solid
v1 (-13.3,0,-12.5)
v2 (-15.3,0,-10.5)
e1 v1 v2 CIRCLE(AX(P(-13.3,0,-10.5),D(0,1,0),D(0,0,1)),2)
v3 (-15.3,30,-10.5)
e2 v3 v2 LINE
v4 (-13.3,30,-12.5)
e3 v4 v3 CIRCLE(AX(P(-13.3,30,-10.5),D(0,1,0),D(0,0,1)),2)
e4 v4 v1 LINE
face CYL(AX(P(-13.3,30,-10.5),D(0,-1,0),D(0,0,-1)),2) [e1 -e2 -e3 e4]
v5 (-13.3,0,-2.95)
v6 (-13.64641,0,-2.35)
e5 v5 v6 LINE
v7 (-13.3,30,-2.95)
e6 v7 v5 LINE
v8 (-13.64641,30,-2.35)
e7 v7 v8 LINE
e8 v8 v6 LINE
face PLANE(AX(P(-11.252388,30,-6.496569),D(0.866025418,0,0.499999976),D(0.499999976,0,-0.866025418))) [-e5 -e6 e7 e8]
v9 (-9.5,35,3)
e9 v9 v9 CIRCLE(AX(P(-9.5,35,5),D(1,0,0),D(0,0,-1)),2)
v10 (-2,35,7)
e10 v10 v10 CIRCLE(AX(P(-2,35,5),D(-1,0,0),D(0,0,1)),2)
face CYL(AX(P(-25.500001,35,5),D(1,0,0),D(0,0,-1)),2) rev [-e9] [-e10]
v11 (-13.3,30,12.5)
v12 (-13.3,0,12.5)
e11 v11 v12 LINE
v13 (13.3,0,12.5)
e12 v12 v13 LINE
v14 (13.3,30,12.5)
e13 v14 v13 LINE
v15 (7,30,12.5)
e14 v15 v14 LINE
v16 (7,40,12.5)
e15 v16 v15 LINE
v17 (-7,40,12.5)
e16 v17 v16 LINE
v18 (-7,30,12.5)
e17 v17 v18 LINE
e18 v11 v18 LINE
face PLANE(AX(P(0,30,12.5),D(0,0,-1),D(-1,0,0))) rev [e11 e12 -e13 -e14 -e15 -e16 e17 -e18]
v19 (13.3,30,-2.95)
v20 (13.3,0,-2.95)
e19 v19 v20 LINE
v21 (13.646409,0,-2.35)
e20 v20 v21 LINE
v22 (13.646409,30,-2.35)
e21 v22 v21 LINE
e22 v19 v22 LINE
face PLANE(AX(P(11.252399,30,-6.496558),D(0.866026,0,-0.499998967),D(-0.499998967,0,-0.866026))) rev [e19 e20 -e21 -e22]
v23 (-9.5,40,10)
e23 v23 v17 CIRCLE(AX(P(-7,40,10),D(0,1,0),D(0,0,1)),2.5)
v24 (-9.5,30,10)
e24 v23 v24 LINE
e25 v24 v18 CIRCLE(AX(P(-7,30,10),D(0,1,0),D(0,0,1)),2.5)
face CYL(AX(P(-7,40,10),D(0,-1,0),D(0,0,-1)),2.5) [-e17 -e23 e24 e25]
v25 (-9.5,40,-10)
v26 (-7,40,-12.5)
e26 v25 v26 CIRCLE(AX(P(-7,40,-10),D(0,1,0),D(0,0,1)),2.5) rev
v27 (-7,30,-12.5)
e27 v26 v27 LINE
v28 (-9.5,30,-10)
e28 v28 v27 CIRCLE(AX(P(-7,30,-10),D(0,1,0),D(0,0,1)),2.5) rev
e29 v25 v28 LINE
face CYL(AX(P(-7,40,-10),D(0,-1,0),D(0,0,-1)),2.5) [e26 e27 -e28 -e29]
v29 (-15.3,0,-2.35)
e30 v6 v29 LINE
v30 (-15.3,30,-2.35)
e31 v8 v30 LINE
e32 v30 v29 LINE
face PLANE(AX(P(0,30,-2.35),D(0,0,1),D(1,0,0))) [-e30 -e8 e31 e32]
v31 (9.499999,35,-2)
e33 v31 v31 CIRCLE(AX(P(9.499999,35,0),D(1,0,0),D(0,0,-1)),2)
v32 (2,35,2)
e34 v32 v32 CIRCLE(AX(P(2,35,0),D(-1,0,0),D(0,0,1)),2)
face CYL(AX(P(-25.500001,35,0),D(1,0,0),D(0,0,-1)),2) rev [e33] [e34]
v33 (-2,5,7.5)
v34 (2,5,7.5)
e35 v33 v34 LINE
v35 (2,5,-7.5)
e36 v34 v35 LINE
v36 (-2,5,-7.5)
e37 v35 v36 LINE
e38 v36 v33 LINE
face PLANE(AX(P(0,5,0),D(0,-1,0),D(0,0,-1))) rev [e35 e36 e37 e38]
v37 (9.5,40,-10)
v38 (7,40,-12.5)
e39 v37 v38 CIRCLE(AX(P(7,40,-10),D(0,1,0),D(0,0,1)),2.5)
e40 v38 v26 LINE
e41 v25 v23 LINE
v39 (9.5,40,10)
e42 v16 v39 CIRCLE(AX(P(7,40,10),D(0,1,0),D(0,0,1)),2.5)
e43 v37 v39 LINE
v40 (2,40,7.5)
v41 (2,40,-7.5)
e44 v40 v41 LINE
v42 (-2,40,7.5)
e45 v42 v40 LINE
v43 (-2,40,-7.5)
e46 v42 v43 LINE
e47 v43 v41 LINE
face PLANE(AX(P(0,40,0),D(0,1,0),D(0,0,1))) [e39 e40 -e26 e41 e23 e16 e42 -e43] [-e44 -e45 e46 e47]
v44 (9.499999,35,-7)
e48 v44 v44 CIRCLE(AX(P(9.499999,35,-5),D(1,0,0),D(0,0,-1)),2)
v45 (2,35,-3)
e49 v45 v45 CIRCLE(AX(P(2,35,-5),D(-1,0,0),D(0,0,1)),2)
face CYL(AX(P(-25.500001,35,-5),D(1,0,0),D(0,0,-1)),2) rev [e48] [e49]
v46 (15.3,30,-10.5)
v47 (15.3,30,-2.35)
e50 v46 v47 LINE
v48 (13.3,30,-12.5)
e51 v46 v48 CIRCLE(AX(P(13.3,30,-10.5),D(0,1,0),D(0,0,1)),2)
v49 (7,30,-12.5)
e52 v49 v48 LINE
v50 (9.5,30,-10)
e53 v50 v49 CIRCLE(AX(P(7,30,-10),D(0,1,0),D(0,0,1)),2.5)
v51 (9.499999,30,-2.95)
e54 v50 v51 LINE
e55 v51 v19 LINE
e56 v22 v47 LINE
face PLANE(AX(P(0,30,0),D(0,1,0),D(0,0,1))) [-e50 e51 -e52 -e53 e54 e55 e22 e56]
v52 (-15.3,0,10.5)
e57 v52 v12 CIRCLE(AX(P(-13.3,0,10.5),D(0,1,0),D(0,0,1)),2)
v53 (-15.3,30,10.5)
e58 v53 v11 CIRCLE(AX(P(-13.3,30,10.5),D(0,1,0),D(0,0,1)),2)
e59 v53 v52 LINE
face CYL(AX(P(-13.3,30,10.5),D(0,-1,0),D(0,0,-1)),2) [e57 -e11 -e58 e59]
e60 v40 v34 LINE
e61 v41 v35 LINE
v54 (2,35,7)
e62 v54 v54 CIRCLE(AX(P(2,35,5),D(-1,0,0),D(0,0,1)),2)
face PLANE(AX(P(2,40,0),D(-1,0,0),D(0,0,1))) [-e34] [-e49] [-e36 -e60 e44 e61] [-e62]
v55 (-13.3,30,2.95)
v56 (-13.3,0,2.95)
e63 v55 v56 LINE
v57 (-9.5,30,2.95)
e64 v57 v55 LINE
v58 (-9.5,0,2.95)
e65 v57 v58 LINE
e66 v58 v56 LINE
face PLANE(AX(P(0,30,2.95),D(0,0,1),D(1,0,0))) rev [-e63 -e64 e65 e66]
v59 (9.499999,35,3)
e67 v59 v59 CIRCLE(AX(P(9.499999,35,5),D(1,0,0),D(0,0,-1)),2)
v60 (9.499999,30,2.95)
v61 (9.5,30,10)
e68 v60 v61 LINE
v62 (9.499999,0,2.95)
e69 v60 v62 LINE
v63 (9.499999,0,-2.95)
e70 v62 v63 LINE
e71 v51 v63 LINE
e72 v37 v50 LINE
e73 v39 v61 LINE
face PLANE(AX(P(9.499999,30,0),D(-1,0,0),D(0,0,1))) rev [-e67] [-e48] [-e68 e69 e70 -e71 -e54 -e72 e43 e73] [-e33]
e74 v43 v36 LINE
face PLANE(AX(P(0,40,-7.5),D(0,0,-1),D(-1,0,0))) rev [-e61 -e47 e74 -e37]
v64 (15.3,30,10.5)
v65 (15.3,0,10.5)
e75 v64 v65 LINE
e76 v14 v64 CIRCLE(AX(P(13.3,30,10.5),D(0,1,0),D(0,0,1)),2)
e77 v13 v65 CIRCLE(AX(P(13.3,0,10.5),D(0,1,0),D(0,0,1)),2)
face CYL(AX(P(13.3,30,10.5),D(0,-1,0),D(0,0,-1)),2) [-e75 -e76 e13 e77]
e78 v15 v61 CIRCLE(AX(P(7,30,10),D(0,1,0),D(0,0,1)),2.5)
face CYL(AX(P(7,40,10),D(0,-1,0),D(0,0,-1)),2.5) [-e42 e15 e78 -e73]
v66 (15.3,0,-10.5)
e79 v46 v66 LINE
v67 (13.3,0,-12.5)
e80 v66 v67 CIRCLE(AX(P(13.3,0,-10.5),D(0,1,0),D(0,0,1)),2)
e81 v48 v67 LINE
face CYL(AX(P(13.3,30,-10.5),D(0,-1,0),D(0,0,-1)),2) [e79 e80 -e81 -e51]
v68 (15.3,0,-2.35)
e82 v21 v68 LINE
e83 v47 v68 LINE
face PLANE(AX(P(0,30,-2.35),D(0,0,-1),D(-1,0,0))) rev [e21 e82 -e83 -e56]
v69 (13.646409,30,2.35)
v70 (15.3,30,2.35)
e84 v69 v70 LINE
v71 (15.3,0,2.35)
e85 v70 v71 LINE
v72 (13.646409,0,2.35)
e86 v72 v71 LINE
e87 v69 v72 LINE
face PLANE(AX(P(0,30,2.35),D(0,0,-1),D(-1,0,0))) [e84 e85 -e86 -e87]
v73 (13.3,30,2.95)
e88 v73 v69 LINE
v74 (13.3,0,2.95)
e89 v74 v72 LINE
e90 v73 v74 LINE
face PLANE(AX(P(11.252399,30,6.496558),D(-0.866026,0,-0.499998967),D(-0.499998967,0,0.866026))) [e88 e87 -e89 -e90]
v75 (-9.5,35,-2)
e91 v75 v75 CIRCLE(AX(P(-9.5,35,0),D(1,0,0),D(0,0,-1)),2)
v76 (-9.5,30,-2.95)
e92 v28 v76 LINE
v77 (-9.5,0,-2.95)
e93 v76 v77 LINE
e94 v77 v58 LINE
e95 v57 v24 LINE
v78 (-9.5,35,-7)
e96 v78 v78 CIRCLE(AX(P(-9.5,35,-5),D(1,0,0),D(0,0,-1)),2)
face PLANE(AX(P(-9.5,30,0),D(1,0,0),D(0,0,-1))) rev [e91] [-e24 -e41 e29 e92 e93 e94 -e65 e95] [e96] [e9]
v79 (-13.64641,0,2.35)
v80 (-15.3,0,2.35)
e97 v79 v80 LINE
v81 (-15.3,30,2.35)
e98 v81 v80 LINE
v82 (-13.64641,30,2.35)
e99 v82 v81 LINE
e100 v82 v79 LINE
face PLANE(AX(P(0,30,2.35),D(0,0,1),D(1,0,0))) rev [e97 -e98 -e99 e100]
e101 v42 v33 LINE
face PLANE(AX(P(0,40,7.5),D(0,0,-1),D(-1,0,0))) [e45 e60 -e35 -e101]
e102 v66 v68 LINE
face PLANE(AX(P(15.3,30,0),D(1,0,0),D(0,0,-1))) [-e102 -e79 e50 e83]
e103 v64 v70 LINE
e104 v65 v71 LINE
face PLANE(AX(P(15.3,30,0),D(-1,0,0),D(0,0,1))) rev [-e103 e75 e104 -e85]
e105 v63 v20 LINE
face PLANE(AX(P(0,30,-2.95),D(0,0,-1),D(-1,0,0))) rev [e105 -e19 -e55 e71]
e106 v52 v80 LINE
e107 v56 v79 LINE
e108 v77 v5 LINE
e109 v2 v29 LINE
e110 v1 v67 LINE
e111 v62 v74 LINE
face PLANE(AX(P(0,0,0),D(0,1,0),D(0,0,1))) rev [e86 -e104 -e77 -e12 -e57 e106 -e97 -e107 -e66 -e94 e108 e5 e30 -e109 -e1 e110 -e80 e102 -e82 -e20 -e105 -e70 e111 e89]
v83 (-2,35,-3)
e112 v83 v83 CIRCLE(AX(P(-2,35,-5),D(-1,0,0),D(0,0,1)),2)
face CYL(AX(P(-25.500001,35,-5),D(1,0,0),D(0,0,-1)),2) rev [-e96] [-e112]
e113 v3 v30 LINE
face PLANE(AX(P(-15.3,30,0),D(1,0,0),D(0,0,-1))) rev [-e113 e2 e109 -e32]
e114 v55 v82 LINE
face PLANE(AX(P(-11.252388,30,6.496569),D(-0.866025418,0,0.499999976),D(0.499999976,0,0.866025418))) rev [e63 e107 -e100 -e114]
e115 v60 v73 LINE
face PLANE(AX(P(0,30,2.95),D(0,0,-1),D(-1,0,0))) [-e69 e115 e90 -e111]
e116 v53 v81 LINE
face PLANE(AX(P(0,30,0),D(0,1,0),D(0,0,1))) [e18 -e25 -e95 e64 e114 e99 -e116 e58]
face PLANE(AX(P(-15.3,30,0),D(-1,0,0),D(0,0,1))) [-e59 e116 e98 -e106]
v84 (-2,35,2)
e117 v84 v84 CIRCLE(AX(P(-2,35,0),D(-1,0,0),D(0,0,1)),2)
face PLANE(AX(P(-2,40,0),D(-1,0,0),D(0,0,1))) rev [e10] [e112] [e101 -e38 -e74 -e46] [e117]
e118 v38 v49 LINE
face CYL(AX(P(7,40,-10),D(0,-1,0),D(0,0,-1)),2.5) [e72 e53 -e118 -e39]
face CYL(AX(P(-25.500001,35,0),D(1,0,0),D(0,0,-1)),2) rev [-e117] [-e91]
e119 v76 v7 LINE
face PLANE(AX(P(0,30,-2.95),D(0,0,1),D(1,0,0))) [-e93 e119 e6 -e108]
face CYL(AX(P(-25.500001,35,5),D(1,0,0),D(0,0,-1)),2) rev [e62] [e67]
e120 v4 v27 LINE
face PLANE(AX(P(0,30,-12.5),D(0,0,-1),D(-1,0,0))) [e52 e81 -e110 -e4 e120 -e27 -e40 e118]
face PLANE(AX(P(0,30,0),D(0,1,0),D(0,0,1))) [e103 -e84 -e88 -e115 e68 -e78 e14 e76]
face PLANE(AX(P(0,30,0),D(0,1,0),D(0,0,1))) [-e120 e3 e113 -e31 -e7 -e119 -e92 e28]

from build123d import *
from OCP.BRepAlgoAPI import BRepAlgoAPI_Cut
from OCP.TopTools import TopTools_ListOfShape

# Parameters (mm, degrees)
BOSS_EXTRUDE1_DEPTH = 30
SKETCH3_W           = 4
SKETCH3_H           = 15
BOSS_EXTRUDE2_DEPTH = 10
SKETCH4_W           = 4
SKETCH4_H           = 15
CUT_EXTRUDE1_DEPTH  = 35
SKETCH5_R           = 2
CUT_EXTRUDE2_DEPTH  = 35


with BuildPart() as part:
    # Sketch2 → Boss-Extrude1 (new body)
    with BuildSketch(Plane(origin=(0, 0, 0), x_dir=(1, 0, 0), z_dir=(0, 1, 0))):
        with BuildLine():
            ThreePointArc((-13.300000086, 12.500000186), (-14.714213649, 11.914213749), (-15.300000086, 10.500000186))
            Line((-15.300000086, 10.500000186), (-15.300000086, 2.350000088))
            Line((-15.300000086, 2.350000088), (-13.646409847, 2.350000088))
            Line((-13.646409847, 2.350000088), (-13.299999759, 2.95))
            Line((-13.299999759, 2.95), (-9.499999695, 2.95))
            Line((-9.499999695, 2.95), (-9.499999695, -2.95))
            Line((-9.499999695, -2.95), (-13.299999759, -2.95))
            Line((-13.299999759, -2.95), (-13.646409847, -2.350000088))
            Line((-13.646409847, -2.350000088), (-15.300000086, -2.350000088))
            Line((-15.300000086, -2.350000088), (-15.300000086, -10.500000186))
            ThreePointArc((-15.300000086, -10.500000186), (-14.714213649, -11.914213749), (-13.300000086, -12.500000186))
            Line((-13.300000086, -12.500000186), (13.300000086, -12.500000186))
            ThreePointArc((13.300000086, -12.500000186), (14.714213649, -11.914213749), (15.300000086, -10.500000186))
            Line((15.300000086, -10.500000186), (15.300000086, -2.350000088))
            Line((15.300000086, -2.350000088), (13.646408916, -2.350000088))
            Line((13.646408916, -2.350000088), (13.299999759, -2.95))
            Line((13.299999759, -2.95), (9.499998763, -2.95))
            Line((9.499998763, -2.95), (9.499998763, 2.95))
            Line((9.499998763, 2.95), (13.299999759, 2.95))
            Line((13.299999759, 2.95), (13.646408916, 2.350000088))
            Line((13.646408916, 2.350000088), (15.300000086, 2.350000088))
            Line((15.300000086, 2.350000088), (15.300000086, 10.500000186))
            ThreePointArc((15.300000086, 10.500000186), (14.714213649, 11.914213749), (13.300000086, 12.500000186))
            Line((13.300000086, 12.500000186), (-13.300000086, 12.500000186))
        make_face()
    extrude(amount=BOSS_EXTRUDE1_DEPTH)

    # Sketch3 → Boss-Extrude2 (add)
    with BuildSketch(Plane(origin=(0, 30, 0), x_dir=(1, 0, 0), z_dir=(0, 1, 0))):
        with BuildLine():
            ThreePointArc((-9.499999695, -10.000000186), (-8.767766647, -11.767767139), (-6.999999695, -12.500000186))
            Line((-6.999999695, -12.500000186), (6.999999695, -12.500000186))
            ThreePointArc((6.999999695, -12.500000186), (8.767766647, -11.767767139), (9.499999695, -10.000000186))
            Line((9.499999695, -10.000000186), (9.499999695, 10.000000186))
            ThreePointArc((9.499999695, 10.000000186), (8.767766647, 11.767767139), (6.999999695, 12.500000186))
            Line((6.999999695, 12.500000186), (-6.999999695, 12.500000186))
            ThreePointArc((-6.999999695, 12.500000186), (-8.767766647, 11.767767139), (-9.499999695, 10.000000186))
            Line((-9.499999695, 10.000000186), (-9.499999695, -10.000000186))
        make_face()
        Rectangle(SKETCH3_W, SKETCH3_H, mode=Mode.SUBTRACT)
    extrude(amount=BOSS_EXTRUDE2_DEPTH)

    # Sketch4 → Cut-Extrude1 (cut)
    with BuildSketch(Plane(origin=(0, 40, 0), x_dir=(1, 0, 0), z_dir=(0, 1, 0))):
        Rectangle(SKETCH4_W, SKETCH4_H)
    extrude(amount=-CUT_EXTRUDE1_DEPTH, mode=Mode.SUBTRACT)


with BuildPart() as cut_extrude2_tool:
    # Sketch5 → Cut-Extrude2 (new body)
    with BuildSketch(Plane(origin=(9.499998763, 0, 0), x_dir=(0, 0, -1), z_dir=(1, 0, 0))):
        with Locations((0, 35)):
            Circle(SKETCH5_R)
        with Locations((5, 35)):
            Circle(SKETCH5_R)
        with Locations((-5, 35)):
            Circle(SKETCH5_R)
    extrude(amount=-CUT_EXTRUDE2_DEPTH)


with BuildPart() as part_1:
    add(part.part)

    # Cut-Extrude2: cut by cut_extrude2_tool, with a tolerance
    cut_extrude2_stock = TopTools_ListOfShape()
    cut_extrude2_stock.Append(part_1.part.wrapped)
    cut_extrude2_tools = TopTools_ListOfShape()
    cut_extrude2_tools.Append(cut_extrude2_tool.part.wrapped)
    cut_extrude2_cut = BRepAlgoAPI_Cut()
    cut_extrude2_cut.SetArguments(cut_extrude2_stock)
    cut_extrude2_cut.SetTools(cut_extrude2_tools)
    cut_extrude2_cut.SetFuzzyValue(0.00001)
    cut_extrude2_cut.Build()
    add(Compound.cast(cut_extrude2_cut.Shape()).solids(), mode=Mode.REPLACE)


solid = part_1.part
